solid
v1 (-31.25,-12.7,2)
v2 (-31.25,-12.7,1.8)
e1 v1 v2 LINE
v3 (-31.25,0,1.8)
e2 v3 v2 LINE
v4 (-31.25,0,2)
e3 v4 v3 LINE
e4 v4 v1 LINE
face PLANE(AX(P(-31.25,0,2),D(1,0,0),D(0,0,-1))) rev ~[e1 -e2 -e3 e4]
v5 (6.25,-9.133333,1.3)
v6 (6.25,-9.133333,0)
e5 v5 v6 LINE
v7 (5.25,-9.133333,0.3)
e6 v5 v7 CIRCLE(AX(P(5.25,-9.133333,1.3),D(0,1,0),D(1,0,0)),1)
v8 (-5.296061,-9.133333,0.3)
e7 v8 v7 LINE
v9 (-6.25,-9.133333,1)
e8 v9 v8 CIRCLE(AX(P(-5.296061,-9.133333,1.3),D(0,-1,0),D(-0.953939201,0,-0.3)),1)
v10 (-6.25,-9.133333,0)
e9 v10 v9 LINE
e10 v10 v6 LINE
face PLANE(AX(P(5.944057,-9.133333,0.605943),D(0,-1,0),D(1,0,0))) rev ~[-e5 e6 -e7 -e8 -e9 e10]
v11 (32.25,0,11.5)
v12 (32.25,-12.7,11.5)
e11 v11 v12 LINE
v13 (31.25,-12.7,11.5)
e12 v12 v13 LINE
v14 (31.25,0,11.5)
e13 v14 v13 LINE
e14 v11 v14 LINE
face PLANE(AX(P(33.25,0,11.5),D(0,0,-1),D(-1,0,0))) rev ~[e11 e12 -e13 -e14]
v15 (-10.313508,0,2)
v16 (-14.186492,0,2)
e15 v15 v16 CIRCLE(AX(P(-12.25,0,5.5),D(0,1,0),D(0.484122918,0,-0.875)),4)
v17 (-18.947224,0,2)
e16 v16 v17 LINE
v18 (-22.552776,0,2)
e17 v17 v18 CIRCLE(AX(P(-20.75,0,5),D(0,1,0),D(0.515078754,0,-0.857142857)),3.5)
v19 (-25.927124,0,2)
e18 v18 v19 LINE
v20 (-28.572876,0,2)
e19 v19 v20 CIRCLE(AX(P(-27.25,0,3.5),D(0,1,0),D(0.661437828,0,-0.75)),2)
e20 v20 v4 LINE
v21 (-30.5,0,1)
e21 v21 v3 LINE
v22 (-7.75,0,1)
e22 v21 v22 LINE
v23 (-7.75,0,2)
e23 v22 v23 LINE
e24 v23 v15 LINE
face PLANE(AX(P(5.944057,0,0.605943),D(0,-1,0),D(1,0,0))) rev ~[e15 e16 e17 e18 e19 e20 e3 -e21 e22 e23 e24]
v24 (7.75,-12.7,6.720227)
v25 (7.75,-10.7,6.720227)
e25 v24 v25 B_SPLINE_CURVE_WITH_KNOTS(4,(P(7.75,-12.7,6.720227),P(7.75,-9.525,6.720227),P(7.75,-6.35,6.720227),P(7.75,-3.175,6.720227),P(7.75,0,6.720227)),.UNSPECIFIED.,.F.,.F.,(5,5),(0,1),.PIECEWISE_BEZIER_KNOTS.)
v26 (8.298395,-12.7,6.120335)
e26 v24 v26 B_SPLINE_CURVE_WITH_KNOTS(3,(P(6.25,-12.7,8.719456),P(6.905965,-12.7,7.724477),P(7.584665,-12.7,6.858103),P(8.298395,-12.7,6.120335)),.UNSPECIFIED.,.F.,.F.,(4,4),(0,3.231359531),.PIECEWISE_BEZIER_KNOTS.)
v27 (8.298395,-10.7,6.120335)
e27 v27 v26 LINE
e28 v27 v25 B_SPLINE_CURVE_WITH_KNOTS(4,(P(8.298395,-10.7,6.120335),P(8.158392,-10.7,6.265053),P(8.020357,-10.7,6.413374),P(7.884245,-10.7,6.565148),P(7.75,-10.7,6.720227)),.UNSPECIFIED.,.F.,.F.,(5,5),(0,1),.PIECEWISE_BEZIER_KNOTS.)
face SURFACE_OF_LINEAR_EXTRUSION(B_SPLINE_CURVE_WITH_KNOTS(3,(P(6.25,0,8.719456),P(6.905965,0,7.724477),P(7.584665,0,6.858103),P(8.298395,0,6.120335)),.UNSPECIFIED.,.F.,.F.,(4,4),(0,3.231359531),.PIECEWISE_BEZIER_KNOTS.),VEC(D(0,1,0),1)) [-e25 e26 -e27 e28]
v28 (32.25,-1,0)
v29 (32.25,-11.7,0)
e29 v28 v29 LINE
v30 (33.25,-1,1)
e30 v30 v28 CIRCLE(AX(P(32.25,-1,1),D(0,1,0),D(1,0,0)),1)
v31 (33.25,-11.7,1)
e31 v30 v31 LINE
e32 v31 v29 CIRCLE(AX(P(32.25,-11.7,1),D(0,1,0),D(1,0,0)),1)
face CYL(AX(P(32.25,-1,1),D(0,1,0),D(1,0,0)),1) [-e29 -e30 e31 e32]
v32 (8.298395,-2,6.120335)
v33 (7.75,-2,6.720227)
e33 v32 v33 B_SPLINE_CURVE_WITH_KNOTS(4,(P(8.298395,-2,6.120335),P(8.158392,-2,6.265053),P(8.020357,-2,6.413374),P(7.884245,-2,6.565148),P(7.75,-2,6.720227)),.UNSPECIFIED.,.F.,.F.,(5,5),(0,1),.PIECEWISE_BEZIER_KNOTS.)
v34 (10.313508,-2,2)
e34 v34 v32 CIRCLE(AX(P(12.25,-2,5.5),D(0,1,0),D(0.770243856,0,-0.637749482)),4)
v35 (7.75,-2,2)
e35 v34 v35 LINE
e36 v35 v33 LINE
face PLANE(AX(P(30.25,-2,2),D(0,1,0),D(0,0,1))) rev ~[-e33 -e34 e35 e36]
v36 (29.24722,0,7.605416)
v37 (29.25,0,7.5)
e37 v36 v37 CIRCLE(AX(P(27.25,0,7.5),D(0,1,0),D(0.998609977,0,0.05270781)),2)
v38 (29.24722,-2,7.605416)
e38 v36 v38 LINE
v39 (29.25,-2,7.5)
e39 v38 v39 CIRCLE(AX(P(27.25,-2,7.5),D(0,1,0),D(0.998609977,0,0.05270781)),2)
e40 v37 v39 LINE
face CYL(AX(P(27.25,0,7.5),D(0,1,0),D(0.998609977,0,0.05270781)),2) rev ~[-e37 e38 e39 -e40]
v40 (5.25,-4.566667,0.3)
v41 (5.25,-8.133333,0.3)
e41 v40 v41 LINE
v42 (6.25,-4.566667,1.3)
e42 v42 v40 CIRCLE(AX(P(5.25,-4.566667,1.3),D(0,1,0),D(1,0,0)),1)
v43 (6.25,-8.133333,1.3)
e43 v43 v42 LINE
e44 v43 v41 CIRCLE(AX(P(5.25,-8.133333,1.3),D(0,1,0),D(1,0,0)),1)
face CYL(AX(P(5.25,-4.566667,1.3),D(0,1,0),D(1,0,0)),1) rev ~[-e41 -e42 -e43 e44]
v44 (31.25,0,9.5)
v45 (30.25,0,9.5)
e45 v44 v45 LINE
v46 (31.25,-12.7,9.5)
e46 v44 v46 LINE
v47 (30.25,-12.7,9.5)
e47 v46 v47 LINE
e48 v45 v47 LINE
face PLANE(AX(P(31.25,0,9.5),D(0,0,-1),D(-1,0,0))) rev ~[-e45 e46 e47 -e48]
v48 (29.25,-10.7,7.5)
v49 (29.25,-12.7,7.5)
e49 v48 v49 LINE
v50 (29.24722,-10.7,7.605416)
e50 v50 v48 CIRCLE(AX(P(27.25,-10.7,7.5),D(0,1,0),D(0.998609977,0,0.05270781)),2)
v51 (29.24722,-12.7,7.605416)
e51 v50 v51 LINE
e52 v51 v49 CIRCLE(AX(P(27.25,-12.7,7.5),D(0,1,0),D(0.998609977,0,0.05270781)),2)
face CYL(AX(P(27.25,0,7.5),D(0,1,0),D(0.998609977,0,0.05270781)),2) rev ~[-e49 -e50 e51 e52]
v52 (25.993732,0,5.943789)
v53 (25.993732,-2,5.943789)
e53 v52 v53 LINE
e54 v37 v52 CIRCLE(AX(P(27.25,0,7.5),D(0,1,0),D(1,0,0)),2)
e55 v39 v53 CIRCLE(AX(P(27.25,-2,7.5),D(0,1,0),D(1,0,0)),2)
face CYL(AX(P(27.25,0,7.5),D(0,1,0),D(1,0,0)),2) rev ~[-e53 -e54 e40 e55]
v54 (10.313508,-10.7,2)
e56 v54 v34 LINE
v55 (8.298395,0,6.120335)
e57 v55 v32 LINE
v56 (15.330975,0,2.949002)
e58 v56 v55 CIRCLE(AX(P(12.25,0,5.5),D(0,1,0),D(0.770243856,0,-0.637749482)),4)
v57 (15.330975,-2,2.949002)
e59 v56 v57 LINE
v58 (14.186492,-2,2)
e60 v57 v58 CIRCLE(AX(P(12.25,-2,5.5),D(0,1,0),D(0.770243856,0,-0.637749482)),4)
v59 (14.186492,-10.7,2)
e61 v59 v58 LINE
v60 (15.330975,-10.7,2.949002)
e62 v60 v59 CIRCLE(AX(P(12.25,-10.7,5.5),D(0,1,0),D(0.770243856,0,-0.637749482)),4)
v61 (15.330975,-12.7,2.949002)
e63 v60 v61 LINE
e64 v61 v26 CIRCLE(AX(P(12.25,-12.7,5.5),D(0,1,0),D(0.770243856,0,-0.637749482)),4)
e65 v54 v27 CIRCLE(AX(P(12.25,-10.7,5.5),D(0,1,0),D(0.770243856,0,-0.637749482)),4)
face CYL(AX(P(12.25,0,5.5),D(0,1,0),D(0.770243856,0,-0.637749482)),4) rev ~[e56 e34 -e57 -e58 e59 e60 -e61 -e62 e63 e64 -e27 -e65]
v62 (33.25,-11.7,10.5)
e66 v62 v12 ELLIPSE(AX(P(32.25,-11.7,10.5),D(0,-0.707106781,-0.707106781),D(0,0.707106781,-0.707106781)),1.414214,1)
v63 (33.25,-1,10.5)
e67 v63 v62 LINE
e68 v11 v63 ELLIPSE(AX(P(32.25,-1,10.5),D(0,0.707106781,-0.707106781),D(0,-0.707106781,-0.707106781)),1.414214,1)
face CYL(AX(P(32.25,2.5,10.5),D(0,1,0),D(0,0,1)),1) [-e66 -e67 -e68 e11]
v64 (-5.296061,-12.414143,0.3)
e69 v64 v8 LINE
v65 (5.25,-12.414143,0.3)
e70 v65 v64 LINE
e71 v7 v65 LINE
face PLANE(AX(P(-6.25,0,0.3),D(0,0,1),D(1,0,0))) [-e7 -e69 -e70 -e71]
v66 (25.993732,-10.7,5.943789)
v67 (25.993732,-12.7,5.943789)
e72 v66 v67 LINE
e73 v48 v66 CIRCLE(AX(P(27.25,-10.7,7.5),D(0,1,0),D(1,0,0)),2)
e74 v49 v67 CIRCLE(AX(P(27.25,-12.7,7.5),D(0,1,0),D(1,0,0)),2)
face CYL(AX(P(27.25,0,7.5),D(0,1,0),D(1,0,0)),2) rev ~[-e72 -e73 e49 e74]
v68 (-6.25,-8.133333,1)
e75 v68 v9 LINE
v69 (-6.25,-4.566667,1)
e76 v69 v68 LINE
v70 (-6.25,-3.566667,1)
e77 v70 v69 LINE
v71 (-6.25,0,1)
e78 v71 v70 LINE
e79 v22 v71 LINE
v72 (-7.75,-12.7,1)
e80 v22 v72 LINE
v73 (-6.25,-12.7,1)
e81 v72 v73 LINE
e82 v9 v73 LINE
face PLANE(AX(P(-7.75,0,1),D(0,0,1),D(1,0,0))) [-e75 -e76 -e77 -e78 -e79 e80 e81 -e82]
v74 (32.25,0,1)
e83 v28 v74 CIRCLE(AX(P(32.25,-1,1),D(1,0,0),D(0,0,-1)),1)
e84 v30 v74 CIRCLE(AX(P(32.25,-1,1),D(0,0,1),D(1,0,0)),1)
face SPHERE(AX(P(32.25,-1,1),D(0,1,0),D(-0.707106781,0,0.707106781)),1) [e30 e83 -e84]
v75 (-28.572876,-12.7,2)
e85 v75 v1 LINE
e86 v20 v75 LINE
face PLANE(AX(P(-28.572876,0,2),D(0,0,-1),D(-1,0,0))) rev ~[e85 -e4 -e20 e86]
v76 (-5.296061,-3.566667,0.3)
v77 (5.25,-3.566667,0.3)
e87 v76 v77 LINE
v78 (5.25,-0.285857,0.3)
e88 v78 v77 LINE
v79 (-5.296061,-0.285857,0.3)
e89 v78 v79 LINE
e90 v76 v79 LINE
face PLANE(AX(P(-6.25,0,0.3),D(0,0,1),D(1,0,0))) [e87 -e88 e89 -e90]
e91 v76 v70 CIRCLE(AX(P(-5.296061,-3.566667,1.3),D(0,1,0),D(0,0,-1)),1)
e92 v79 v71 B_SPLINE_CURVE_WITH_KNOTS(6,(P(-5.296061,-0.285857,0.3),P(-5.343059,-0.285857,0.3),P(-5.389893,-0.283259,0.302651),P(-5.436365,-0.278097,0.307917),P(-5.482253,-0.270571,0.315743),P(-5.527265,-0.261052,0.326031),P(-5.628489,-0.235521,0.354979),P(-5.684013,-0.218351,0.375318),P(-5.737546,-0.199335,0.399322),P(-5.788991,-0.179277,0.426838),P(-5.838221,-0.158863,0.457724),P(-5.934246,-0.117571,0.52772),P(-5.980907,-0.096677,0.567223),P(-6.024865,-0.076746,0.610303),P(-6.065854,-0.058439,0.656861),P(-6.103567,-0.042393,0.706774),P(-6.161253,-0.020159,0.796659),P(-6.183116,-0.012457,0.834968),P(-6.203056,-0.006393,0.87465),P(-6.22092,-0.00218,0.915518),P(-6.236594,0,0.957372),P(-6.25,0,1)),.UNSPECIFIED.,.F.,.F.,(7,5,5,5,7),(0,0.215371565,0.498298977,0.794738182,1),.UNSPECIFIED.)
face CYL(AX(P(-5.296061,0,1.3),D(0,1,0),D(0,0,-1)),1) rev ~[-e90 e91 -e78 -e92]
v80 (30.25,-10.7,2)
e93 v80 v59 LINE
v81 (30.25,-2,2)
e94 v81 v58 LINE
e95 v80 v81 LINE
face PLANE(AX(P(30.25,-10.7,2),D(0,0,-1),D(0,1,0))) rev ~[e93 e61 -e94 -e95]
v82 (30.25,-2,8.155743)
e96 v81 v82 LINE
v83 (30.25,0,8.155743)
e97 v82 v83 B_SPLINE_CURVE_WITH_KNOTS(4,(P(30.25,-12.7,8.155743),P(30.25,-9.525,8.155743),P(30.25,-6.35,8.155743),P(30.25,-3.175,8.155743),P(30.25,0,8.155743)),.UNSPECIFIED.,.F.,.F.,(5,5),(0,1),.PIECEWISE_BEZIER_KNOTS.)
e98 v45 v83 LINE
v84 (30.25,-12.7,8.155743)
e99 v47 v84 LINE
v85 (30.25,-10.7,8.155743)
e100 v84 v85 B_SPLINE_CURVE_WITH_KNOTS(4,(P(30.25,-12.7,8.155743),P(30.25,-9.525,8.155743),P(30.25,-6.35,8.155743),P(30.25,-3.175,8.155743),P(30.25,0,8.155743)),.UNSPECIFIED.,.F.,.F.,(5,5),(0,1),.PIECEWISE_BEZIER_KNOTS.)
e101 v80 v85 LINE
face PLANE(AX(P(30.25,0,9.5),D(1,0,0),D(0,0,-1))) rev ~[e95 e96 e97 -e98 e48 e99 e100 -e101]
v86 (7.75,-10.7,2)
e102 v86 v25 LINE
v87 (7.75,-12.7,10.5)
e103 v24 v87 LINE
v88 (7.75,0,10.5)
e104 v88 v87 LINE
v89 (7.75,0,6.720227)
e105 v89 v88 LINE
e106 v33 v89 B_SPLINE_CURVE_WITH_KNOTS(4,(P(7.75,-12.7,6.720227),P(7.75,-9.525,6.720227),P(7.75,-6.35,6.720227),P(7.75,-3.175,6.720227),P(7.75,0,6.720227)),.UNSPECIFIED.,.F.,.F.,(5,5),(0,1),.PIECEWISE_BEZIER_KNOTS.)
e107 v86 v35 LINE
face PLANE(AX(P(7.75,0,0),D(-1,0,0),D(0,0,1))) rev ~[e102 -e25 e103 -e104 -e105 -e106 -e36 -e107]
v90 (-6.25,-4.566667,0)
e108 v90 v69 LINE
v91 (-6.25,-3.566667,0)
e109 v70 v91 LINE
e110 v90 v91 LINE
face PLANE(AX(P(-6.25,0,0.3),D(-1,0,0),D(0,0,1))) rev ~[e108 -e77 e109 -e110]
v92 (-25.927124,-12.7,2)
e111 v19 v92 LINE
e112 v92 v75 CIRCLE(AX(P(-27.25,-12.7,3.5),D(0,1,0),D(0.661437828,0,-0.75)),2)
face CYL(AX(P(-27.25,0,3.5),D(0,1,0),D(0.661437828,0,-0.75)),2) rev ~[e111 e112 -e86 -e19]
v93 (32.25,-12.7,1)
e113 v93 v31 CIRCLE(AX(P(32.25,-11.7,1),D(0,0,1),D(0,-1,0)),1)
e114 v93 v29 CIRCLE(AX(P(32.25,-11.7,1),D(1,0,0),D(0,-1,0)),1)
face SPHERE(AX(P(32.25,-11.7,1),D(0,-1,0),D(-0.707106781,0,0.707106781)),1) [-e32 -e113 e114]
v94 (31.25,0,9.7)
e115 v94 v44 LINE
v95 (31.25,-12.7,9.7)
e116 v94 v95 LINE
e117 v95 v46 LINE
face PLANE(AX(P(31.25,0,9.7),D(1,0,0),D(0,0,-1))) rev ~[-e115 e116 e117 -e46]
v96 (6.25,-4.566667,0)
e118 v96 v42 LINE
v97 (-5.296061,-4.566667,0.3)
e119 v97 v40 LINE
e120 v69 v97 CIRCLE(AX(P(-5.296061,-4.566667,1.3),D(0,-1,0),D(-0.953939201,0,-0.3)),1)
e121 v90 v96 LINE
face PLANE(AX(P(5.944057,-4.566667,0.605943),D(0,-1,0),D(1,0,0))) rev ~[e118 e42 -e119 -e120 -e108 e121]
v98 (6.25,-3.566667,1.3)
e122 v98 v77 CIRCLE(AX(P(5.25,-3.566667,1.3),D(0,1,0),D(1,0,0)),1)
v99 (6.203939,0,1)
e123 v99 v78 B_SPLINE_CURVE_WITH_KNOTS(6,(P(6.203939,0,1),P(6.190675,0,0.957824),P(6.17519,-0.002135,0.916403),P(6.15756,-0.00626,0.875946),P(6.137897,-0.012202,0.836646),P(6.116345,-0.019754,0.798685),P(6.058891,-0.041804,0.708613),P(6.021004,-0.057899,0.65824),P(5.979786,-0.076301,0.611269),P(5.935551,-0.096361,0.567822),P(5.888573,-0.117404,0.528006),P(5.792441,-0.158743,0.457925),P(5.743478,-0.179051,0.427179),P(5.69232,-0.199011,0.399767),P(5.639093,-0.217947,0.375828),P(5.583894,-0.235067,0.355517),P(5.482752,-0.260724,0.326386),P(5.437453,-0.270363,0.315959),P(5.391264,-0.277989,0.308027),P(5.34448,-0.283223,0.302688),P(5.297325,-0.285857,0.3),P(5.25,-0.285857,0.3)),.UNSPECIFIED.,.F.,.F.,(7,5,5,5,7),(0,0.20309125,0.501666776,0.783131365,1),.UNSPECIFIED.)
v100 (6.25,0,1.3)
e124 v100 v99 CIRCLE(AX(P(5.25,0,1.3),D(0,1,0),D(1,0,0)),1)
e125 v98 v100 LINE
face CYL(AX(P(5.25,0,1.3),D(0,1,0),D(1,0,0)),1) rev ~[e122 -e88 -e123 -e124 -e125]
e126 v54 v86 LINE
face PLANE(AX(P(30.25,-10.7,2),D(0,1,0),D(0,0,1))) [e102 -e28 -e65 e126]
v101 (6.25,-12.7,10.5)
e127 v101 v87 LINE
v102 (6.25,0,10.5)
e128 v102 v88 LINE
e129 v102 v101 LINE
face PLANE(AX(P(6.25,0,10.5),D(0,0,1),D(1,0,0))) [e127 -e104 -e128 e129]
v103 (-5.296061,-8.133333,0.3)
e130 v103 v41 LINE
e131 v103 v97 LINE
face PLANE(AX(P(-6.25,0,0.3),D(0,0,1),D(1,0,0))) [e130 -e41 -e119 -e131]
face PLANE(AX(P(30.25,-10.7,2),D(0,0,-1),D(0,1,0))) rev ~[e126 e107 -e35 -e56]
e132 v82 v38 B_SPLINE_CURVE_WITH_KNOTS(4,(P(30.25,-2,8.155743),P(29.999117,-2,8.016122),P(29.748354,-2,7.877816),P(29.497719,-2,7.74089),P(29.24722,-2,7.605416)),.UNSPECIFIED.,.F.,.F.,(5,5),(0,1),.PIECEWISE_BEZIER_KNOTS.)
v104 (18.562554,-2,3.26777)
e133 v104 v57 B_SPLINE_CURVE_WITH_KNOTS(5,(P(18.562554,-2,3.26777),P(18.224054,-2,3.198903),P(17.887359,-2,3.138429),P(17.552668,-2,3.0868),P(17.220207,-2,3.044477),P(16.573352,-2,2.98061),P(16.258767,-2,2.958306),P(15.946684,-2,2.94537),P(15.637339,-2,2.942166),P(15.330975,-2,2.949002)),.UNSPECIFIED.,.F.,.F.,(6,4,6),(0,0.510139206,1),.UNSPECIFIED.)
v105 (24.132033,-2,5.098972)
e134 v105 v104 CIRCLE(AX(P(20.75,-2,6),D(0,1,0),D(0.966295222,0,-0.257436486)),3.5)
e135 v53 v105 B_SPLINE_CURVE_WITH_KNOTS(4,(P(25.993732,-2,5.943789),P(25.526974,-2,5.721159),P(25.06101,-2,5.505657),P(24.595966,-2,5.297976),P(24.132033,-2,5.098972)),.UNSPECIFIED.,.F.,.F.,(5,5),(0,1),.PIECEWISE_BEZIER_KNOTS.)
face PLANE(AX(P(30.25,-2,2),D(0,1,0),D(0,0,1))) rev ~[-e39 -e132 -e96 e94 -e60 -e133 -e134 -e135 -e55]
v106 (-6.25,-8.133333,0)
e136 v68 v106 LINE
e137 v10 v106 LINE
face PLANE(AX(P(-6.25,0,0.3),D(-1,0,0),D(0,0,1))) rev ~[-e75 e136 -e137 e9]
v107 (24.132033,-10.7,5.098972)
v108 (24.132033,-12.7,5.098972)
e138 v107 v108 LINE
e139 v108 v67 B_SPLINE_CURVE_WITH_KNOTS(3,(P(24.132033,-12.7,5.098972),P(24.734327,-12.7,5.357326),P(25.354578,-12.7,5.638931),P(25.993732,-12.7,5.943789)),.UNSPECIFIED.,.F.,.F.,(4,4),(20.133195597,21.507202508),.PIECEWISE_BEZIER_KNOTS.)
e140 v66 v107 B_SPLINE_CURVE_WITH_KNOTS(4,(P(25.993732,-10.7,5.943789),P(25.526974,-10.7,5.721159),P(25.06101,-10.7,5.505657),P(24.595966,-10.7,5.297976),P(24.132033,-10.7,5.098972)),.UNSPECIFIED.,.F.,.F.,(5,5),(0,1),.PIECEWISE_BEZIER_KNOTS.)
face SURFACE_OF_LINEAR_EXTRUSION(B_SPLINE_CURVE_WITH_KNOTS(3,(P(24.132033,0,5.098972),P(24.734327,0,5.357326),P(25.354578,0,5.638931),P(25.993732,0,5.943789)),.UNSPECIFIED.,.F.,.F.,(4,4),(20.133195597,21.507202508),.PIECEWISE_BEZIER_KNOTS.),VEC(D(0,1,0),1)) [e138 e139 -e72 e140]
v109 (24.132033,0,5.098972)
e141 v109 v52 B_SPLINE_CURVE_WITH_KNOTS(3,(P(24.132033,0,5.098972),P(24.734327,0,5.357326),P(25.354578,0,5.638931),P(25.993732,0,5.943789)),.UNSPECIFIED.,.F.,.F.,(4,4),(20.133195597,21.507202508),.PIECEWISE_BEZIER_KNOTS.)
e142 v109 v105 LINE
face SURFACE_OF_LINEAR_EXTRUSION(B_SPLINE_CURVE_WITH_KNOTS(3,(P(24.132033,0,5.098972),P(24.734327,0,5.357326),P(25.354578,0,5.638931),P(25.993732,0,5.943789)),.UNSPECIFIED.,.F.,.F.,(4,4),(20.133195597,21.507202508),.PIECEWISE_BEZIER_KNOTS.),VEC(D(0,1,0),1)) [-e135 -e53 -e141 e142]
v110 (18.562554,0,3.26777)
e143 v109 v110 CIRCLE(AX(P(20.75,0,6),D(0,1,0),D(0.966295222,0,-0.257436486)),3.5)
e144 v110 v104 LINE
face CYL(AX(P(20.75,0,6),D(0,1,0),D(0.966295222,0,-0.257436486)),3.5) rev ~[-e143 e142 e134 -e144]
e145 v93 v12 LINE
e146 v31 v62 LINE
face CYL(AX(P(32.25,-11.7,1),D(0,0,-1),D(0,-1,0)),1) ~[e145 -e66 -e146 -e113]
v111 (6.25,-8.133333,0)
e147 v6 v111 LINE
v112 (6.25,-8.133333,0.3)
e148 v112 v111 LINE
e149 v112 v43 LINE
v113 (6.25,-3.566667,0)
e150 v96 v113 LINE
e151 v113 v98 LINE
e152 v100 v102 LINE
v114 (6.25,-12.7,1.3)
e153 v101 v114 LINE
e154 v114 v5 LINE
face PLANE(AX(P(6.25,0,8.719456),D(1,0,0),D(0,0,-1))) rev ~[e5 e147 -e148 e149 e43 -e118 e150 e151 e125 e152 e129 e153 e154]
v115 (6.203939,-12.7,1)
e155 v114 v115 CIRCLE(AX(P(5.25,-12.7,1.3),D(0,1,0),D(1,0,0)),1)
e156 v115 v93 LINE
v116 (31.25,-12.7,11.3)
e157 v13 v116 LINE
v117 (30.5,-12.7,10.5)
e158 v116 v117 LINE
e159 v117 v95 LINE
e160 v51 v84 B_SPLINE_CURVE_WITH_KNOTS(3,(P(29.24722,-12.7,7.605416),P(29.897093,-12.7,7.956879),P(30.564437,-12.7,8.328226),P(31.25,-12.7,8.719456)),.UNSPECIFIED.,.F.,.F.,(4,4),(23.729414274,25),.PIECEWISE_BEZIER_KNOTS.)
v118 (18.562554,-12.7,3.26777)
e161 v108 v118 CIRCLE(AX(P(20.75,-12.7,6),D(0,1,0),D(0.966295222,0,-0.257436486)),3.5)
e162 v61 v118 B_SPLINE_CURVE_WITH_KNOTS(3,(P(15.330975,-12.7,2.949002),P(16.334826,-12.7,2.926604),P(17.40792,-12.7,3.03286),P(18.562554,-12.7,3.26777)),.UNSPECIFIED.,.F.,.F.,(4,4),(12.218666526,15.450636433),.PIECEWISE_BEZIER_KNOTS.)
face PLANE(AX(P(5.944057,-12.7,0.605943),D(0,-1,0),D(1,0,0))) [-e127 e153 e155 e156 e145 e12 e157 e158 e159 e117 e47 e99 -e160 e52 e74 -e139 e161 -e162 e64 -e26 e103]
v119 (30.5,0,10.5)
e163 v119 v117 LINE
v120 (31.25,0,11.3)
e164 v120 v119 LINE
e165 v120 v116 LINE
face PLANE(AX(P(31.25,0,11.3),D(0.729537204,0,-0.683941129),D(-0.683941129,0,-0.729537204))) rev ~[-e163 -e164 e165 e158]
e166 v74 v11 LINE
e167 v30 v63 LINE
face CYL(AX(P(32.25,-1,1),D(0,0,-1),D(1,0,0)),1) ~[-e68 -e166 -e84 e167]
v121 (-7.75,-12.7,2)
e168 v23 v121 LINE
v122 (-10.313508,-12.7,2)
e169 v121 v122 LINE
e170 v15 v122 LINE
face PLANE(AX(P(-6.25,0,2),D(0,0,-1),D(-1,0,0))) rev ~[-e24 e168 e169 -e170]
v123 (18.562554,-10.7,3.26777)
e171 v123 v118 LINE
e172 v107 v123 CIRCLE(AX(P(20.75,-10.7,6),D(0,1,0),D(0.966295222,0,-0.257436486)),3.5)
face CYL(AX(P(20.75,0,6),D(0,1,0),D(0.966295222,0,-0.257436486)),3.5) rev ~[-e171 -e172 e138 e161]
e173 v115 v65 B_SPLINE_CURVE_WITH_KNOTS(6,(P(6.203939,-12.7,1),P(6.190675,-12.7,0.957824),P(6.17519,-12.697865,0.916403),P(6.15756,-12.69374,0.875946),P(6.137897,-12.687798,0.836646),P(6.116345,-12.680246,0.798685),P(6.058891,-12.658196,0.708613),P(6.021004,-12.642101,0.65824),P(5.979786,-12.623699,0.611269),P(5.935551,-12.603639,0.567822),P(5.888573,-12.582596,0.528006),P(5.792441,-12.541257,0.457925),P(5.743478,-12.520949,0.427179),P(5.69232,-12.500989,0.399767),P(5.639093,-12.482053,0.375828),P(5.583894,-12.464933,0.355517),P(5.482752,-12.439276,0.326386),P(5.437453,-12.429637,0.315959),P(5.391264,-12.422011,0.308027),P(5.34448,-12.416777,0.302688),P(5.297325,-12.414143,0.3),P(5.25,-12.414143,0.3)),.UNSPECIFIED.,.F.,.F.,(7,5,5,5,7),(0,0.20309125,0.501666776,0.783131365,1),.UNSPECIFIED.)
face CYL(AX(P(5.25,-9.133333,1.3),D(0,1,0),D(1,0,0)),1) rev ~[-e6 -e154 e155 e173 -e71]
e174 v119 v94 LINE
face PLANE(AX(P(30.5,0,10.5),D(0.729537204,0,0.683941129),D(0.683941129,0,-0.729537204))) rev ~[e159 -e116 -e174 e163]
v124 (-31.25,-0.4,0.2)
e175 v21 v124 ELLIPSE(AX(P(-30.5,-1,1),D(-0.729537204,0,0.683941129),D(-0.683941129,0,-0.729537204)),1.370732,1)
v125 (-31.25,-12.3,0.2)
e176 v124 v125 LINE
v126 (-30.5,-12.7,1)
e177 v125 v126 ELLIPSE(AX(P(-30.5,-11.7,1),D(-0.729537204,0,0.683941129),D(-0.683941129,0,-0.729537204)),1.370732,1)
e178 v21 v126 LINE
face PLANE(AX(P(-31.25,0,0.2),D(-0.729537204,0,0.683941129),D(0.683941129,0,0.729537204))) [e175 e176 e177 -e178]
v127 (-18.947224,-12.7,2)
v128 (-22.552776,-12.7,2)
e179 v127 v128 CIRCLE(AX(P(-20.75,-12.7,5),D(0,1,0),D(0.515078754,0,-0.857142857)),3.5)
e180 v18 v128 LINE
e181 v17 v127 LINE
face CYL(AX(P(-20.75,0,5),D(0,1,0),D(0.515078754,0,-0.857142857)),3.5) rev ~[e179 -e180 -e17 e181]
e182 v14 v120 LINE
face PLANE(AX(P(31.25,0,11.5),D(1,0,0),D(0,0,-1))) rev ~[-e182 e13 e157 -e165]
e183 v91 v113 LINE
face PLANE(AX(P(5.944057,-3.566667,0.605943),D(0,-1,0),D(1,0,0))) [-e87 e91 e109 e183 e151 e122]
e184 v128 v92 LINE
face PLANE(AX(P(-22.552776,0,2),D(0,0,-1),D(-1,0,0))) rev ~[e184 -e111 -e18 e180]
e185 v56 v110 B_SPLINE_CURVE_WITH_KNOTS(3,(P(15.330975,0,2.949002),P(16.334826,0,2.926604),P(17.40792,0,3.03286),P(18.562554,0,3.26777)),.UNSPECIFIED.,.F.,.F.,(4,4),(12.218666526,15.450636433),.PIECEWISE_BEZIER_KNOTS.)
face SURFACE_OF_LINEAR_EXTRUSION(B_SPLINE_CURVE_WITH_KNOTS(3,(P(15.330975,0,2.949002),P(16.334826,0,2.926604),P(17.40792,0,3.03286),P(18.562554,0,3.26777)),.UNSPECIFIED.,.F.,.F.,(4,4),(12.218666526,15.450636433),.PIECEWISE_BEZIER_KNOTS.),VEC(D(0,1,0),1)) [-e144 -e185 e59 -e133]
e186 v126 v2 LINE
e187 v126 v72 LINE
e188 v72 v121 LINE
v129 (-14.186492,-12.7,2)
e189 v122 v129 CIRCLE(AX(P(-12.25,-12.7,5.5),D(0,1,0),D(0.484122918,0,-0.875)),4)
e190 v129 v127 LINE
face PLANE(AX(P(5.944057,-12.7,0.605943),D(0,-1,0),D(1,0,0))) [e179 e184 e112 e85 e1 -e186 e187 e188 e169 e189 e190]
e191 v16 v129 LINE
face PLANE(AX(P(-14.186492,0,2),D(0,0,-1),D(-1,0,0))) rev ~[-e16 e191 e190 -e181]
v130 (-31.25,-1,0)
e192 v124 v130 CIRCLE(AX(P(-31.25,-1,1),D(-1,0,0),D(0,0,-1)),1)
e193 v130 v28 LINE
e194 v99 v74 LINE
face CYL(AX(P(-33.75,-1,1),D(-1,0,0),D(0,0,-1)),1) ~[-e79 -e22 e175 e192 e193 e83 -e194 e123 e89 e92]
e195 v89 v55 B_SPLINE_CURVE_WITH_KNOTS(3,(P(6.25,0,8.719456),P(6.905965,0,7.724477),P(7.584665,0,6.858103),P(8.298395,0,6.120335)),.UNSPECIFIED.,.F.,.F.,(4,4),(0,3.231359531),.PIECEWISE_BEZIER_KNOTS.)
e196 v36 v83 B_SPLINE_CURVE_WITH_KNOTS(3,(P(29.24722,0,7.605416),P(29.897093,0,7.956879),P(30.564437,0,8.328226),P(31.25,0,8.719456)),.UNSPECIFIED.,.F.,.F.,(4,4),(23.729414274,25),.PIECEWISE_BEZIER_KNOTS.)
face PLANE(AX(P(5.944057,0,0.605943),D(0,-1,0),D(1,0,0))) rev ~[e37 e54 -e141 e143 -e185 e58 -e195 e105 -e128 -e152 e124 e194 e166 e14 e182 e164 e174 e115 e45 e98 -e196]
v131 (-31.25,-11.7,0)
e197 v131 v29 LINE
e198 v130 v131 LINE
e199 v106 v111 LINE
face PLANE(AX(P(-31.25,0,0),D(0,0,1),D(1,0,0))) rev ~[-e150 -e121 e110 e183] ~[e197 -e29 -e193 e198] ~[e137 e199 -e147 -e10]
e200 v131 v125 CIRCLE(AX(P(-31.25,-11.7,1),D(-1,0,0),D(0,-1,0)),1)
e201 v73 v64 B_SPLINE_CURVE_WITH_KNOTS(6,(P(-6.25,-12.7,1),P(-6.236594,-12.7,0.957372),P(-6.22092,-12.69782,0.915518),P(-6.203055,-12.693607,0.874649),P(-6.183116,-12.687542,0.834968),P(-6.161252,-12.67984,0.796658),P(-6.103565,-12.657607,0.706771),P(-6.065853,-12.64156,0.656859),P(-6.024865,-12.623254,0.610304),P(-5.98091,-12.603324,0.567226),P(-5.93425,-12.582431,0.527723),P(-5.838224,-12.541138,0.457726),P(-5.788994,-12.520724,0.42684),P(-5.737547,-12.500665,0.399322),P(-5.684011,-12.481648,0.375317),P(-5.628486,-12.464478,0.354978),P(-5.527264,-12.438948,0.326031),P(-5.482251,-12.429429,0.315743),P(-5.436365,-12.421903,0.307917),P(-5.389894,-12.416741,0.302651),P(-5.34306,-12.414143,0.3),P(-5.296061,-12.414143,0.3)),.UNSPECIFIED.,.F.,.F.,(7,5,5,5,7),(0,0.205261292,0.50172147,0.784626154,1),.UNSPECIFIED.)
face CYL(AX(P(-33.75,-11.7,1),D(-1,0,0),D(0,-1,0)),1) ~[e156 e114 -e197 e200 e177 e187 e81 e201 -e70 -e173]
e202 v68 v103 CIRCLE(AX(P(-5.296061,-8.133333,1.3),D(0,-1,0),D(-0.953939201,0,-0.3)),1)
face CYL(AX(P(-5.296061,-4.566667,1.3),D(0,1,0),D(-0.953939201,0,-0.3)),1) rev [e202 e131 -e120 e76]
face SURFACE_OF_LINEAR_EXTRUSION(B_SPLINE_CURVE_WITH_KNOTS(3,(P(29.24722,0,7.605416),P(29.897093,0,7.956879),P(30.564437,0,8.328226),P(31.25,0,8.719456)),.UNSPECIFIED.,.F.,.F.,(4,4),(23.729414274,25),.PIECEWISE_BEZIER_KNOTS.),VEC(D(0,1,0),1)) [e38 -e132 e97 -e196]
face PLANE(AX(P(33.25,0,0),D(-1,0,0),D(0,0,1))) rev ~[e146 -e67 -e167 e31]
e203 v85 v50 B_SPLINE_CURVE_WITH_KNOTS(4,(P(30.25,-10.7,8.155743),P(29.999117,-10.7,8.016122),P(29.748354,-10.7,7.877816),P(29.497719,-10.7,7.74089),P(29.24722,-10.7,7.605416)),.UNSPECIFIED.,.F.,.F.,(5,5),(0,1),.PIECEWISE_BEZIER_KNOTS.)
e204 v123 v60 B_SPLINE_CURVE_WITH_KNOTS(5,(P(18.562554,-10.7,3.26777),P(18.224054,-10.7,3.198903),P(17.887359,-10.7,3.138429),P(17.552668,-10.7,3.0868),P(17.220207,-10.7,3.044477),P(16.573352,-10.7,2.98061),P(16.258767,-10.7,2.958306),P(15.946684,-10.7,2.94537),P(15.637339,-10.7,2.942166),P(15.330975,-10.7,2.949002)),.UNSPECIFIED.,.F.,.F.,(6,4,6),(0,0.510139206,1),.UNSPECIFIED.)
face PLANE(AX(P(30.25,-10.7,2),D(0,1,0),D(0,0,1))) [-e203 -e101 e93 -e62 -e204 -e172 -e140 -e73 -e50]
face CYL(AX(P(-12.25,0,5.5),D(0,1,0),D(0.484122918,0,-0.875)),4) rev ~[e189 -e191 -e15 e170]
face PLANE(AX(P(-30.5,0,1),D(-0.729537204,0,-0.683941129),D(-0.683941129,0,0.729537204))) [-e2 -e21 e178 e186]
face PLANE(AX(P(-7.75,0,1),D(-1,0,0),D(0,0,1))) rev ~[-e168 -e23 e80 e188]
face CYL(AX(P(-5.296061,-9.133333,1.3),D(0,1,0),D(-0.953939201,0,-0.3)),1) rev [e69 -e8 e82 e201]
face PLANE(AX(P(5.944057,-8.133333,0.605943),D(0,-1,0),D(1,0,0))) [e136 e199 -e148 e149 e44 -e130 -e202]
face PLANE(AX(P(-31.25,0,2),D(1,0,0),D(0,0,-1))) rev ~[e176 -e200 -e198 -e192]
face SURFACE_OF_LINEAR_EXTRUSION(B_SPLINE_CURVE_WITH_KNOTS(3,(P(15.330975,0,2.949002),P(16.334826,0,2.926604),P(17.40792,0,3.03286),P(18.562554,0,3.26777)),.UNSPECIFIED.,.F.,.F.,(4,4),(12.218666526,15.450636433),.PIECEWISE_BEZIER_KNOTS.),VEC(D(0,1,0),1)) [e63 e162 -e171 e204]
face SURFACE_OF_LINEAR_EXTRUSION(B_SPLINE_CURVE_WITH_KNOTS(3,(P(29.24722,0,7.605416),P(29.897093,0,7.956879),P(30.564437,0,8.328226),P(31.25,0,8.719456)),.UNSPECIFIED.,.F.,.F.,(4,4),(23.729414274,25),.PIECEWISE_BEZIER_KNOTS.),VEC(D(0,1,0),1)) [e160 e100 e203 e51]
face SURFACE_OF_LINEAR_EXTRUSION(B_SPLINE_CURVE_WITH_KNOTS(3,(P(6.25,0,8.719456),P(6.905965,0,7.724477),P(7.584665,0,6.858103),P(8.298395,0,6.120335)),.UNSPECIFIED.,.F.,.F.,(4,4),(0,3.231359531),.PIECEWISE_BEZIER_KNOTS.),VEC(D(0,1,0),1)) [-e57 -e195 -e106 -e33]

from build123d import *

# Parameters (mm, degrees)
F1_W          = 12.5
F1_H          = 0.3
F2_DEPTH      = 12.7
F5_START      = -1
F3_W          = 8.7
F3_H          = 6.7194561801
F5_DEPTH      = 22.5
F4_W          = 1.5
F4_H          = 1
F6_DEPTH      = 12.7
F4_H_2        = 10.5
F7_DEPTH      = 12.7
F8_W          = 12.5
F8_H          = 1
F9_DEPTH      = 0.3
F10_T1_DEPTH  = 3.5666666667
F10_T3_DEPTH  = 3.5666666667
F10_T5_DEPTH  = 3.5666666667
F10_T10_DEPTH = 8.5666666667
F10_T15_DEPTH = 8.5666666667
F10_T20_DEPTH = 8.5666666667
F10_T25_DEPTH = 8.5666666667
F10_T30_DEPTH = 8.3363626738
F10_T35_DEPTH = 8.3363626738
F10_T40_DEPTH = 8.3363626738
F10_T45_DEPTH = 8.3363626738
F11_T1_DEPTH  = 66
F11_T3_DEPTH  = 10.7
F11_T5_DEPTH  = 13
F11_T7_DEPTH  = 17.7
F11_S11_W     = 1
F11_S11_H     = 1
F11_T12_DEPTH = 1
F11_S17_W     = 1
F11_S17_H     = 1
F11_T18_DEPTH = 1


# Not quite as in the source:
# - a fillet or chamfer that OpenCascade refuses, or shapes differently, is made with other operations: its cross-section is extruded or revolved along the edge and cut away or added
# - a feature names something its author has since deleted; it is built from what else it names


with BuildPart() as f2:
    # F1 (on Front) → F2 (new body)
    with BuildSketch(Plane.XZ):
        with BuildLine():
            ThreePointArc((-25.9271243445, 2), (-27.25, 1.5), (-28.5728756555, 2))
            Line((-28.5728756555, 2), (-31.25, 2))
            Line((-31.25, 2), (-31.25, 0))
            Line((-31.25, 0), (-6.25, 0))
            Line((-6.25, 0), (-6.25, 0.3))
            Line((-6.25, 0.3), (-6.25, 2))
            Line((-6.25, 2), (-10.3135083269, 2))
            ThreePointArc((-10.3135083269, 2), (-12.25, 1.5), (-14.1864916731, 2))
            Line((-14.1864916731, 2), (-18.9472243623, 2))
            ThreePointArc((-18.9472243623, 2), (-20.75, 1.5), (-22.5527756377, 2))
            Line((-22.5527756377, 2), (-25.9271243445, 2))
        make_face()
        with Locations((0, 0.15)):
            Rectangle(F1_W, F1_H)
        with BuildLine():
            Line((6.25, 0.3), (6.25, 0))
            Line((6.25, 0), (31.25, 0))
            Line((31.25, 0), (31.25, 8.7194561801))
            add(Edge.make_bspline(
                [(29.2472199547, 7.6054156174), (29.8970928976, 7.9568787945), (30.5644371549, 8.3282256487), (31.25, 8.7194561801)],
                knots=[23.7294142738, 23.7294142738, 23.7294142738, 23.7294142738, 25, 25, 25, 25], degree=3))
            ThreePointArc((29.2472199547, 7.6054156174), (29.2493048679, 7.5527261345), (29.25, 7.5))
            ThreePointArc((29.25, 7.5), (28.112399222, 5.6954868851), (25.993732418, 5.9437892937))
            add(Edge.make_bspline(
                [(24.1320332758, 5.0989722973), (24.7343267633, 5.3573256266), (25.3545781422, 5.638931292), (25.993732418, 5.9437892937)],
                knots=[20.1331955968, 20.1331955968, 20.1331955968, 20.1331955968, 21.5072025076, 21.5072025076, 21.5072025076, 21.5072025076], degree=3))
            ThreePointArc((24.1320332758, 5.0989722973), (21.8431992343, 2.6751067033), (18.5625536561, 3.2677704173))
            add(Edge.make_bspline(
                [(15.3309754243, 2.9490020708), (16.3348264574, 2.926604162), (17.4079195378, 3.0328602775), (18.5625536561, 3.2677704173)],
                knots=[12.2186665261, 12.2186665261, 12.2186665261, 12.2186665261, 15.4506364332, 15.4506364332, 15.4506364332, 15.4506364332], degree=3))
            ThreePointArc((15.3309754243, 2.9490020708), (10.6056653115, 1.8536095338), (8.2983946259, 6.1203345608))
            add(Edge.make_bspline(
                [(6.25, 8.7194561801), (6.9059645215, 7.7244768722), (7.5846653889, 6.8581029991), (8.2983946259, 6.1203345608)],
                knots=[0, 0, 0, 0, 3.2313595313, 3.2313595313, 3.2313595313, 3.2313595313], degree=3))
            Line((6.25, 8.7194561801), (6.25, 0.3))
        make_face()
    extrude(amount=F2_DEPTH)

    # F3 (on face) → F5 (cut)
    with BuildSketch(Plane.YZ.offset(31.25).offset(F5_START)):
        with Locations((-6.35, 5.35972809)):
            Rectangle(F3_W, F3_H)
    extrude(amount=-F5_DEPTH, mode=Mode.SUBTRACT)

    # F4 (on Front) → F6 (cut, through all)
    with BuildSketch(Plane.XZ):
        with Locations((-7, 1.5)):
            Rectangle(F4_W, F4_H)
        Polygon((-30.5, 1), (-31.25, 1.8), (-31.25, 1), align=None)
        Polygon((-30.5, 1), (-31.25, 1), (-31.25, 0.2), align=None)
    extrude(amount=F6_DEPTH, mode=Mode.SUBTRACT)

    # F4 (on Front) → F7 (join, through all)
    with BuildSketch(Plane.XZ):
        Polygon((30.25, 0), (31.25, 0), (33.25, 0), (33.25, 11.5), (31.25, 11.5), (31.25, 11.3), (31.25, 10.5), (31.25, 9.7), (31.25, 9.5), (30.25, 9.5), align=None)
        with Locations((7, 5.25)):
            Rectangle(F4_W, F4_H_2)
        Polygon((30.5, 10.5), (31.25, 9.7), (31.25, 10.5), align=None)
        Polygon((31.25, 10.5), (31.25, 11.3), (30.5, 10.5), align=None)
    extrude(amount=F7_DEPTH)

    # F8 (on face) → F9 (cut, through all)
    with BuildSketch(Plane.XY.offset(0.3)):
        with Locations((0, -8.6333333333)):
            Rectangle(F8_W, F8_H)
        with Locations((0, -4.0666666667)):
            Rectangle(F8_W, F8_H)
    extrude(amount=-F9_DEPTH, mode=Mode.SUBTRACT)

    # F10: fillet of radius 1 on 6 edges, made by hand

    # F10_s2 → F10_t1 (join)
    with BuildSketch(Plane.XZ.offset(9.1333333333)):
        with BuildLine():
            ThreePointArc((6.25, 1.3), (5.9571067812, 0.5928932188), (5.25, 0.3))
            Line((5.25, 0.3), (6.25, 0.3))
            Line((6.25, 0.3), (6.25, 1.3))
        make_face()
        with BuildLine():
            ThreePointArc((-6.25, 1), (-5.8876687769, 0.4937742252), (-5.2960607986, 0.3))
            Line((-5.2960607986, 0.3), (-6.25, 0.3))
            Line((-6.25, 0.3), (-6.25, 1))
        make_face()
    extrude(amount=F10_T1_DEPTH)

    # F10_s4 → F10_t3 (join)
    with BuildSketch(Plane.XZ.offset(4.5666666667)):
        with BuildLine():
            ThreePointArc((6.25, 1.3), (5.9571067812, 0.5928932188), (5.25, 0.3))
            Line((5.25, 0.3), (6.25, 0.3))
            Line((6.25, 0.3), (6.25, 1.3))
        make_face()
        with BuildLine():
            ThreePointArc((-6.25, 1), (-5.8876687769, 0.4937742252), (-5.2960607986, 0.3))
            Line((-5.2960607986, 0.3), (-6.25, 0.3))
            Line((-6.25, 0.3), (-6.25, 1))
        make_face()
    extrude(amount=F10_T3_DEPTH)

    # F10_s6 → F10_t5 (join)
    with BuildSketch(Plane.XZ):
        with BuildLine():
            ThreePointArc((6.25, 1.3), (5.9571067812, 0.5928932188), (5.25, 0.3))
            Line((5.25, 0.3), (6.25, 0.3))
            Line((6.25, 0.3), (6.25, 1.3))
        make_face()
        with BuildLine():
            ThreePointArc((-5.2960607986, 0.3), (-5.8876687769, 0.4937742252), (-6.25, 1))
            Line((-6.25, 1), (-6.25, 0.3))
            Line((-6.25, 0.3), (-5.2960607986, 0.3))
        make_face()
    extrude(amount=F10_T5_DEPTH)


with BuildPart() as f10_tool8:
    # F10_s9 → F10_t10 (new body)
    with BuildSketch(Plane.XZ.offset(6.6333333333)):
        with BuildLine():
            ThreePointArc((6.25, 1.3), (5.9571067812, 0.5928932188), (5.25, 0.3))
            Line((5.25, 0.3), (6.25, 0.3))
            Line((6.25, 0.3), (6.25, 1.3))
        make_face()
    extrude(amount=F10_T10_DEPTH)

    split(bisect_by=Plane.XZ.offset(8.1333333333), keep=Keep.BOTTOM)


with BuildPart() as f2_1:
    add(f2.part)

    # F10_t7: union F10_tool8
    add(f10_tool8.part)


with BuildPart() as f10_tool13:
    # F10_s14 → F10_t15 (new body)
    with BuildSketch(Plane.XZ.offset(2.0666666667)):
        with BuildLine():
            ThreePointArc((6.25, 1.3), (5.9571067812, 0.5928932188), (5.25, 0.3))
            Line((5.25, 0.3), (6.25, 0.3))
            Line((6.25, 0.3), (6.25, 1.3))
        make_face()
    extrude(amount=F10_T15_DEPTH)

    split(bisect_by=Plane.XZ.offset(3.5666666667), keep=Keep.BOTTOM)


with BuildPart() as f2_2:
    add(f2_1.part)

    # F10_t12: union F10_tool13
    add(f10_tool13.part)


with BuildPart() as f10_tool18:
    # F10_s19 → F10_t20 (new body)
    with BuildSketch(Plane.XZ.offset(2.0666666667)):
        with BuildLine():
            ThreePointArc((6.25, 1.3), (5.9571067812, 0.5928932188), (5.25, 0.3))
            Line((5.25, 0.3), (6.25, 0.3))
            Line((6.25, 0.3), (6.25, 1.3))
        make_face()
    extrude(amount=F10_T20_DEPTH)

    split(bisect_by=Plane.XZ.offset(9.1333333333), keep=Keep.TOP)


with BuildPart() as f2_3:
    add(f2_2.part)

    # F10_t17: union F10_tool18
    add(f10_tool18.part)


with BuildPart() as f10_tool23:
    # F10_s24 → F10_t25 (new body)
    with BuildSketch(Plane.XZ.offset(-2.5)):
        with BuildLine():
            ThreePointArc((6.25, 1.3), (5.9571067812, 0.5928932188), (5.25, 0.3))
            Line((5.25, 0.3), (6.25, 0.3))
            Line((6.25, 0.3), (6.25, 1.3))
        make_face()
    extrude(amount=F10_T25_DEPTH)

    split(bisect_by=Plane.XZ.offset(4.5666666667), keep=Keep.TOP)


with BuildPart() as f2_4:
    add(f2_3.part)

    # F10_t22: union F10_tool23
    add(f10_tool23.part)


with BuildPart() as f10_tool28:
    # F10_s29 → F10_t30 (new body)
    with BuildSketch(Plane.XZ.offset(-2.3848480035)):
        with BuildLine():
            ThreePointArc((-5.2960607986, 0.3), (-5.8876687769, 0.4937742252), (-6.25, 1))
            Line((-6.25, 1), (-6.25, 0.3))
            Line((-6.25, 0.3), (-5.2960607986, 0.3))
        make_face()
    extrude(amount=F10_T30_DEPTH)

    split(bisect_by=Plane.XZ.offset(4.5666666667), keep=Keep.TOP)


with BuildPart() as f2_5:
    add(f2_4.part)

    # F10_t27: union F10_tool28
    add(f10_tool28.part)


with BuildPart() as f10_tool33:
    # F10_s34 → F10_t35 (new body)
    with BuildSketch(Plane.XZ.offset(2.1818186631)):
        with BuildLine():
            ThreePointArc((-6.25, 1), (-5.8876687769, 0.4937742252), (-5.2960607986, 0.3))
            Line((-5.2960607986, 0.3), (-6.25, 0.3))
            Line((-6.25, 0.3), (-6.25, 1))
        make_face()
    extrude(amount=F10_T35_DEPTH)

    split(bisect_by=Plane.XZ.offset(3.5666666667), keep=Keep.BOTTOM)


with BuildPart() as f2_6:
    add(f2_5.part)

    # F10_t32: union F10_tool33
    add(f10_tool33.part)


with BuildPart() as f10_tool38:
    # F10_s39 → F10_t40 (new body)
    with BuildSketch(Plane.XZ.offset(2.1818186631)):
        with BuildLine():
            ThreePointArc((-6.25, 1), (-5.8876687769, 0.4937742252), (-5.2960607986, 0.3))
            Line((-5.2960607986, 0.3), (-6.25, 0.3))
            Line((-6.25, 0.3), (-6.25, 1))
        make_face()
    extrude(amount=F10_T40_DEPTH)

    split(bisect_by=Plane.XZ.offset(9.1333333333), keep=Keep.TOP)


with BuildPart() as f2_7:
    add(f2_6.part)

    # F10_t37: union F10_tool38
    add(f10_tool38.part)


with BuildPart() as f10_tool43:
    # F10_s44 → F10_t45 (new body)
    with BuildSketch(Plane.XZ.offset(6.7484853298)):
        with BuildLine():
            ThreePointArc((-6.25, 1), (-5.8876687769, 0.4937742252), (-5.2960607986, 0.3))
            Line((-5.2960607986, 0.3), (-6.25, 0.3))
            Line((-6.25, 0.3), (-6.25, 1))
        make_face()
    extrude(amount=F10_T45_DEPTH)

    split(bisect_by=Plane.XZ.offset(8.1333333333), keep=Keep.BOTTOM)


with BuildPart() as f2_8:
    add(f2_7.part)

    # F10_t42: union F10_tool43
    add(f10_tool43.part)

    # F11: fillet of radius 1 on 6 edges, made by hand

    # F11_s2 → F11_t1 (cut)
    with BuildSketch(Plane.YZ.offset(-33.75)):
        with BuildLine():
            ThreePointArc((-1, 0), (-0.2928932188, 0.2928932188), (0, 1))
            Line((0, 1), (0, 0))
            Line((0, 0), (-1, 0))
        make_face()
        with BuildLine():
            ThreePointArc((-12.7, 1), (-12.4071067812, 0.2928932188), (-11.7, 0))
            Line((-11.7, 0), (-12.7, 0))
            Line((-12.7, 0), (-12.7, 1))
        make_face()
    extrude(amount=F11_T1_DEPTH, mode=Mode.SUBTRACT)

    # F11_s4 → F11_t3 (cut)
    with BuildSketch(Plane.XZ.offset(1)):
        with BuildLine():
            ThreePointArc((33.25, 1), (32.9571067812, 0.2928932188), (32.25, 0))
            Line((32.25, 0), (33.25, 0))
            Line((33.25, 0), (33.25, 1))
        make_face()
    extrude(amount=F11_T3_DEPTH, mode=Mode.SUBTRACT)

    # F11_s6 → F11_t5 (cut)
    with BuildSketch(Plane.XY.offset(1)):
        with BuildLine():
            ThreePointArc((32.25, -12.7), (32.9571067812, -12.4071067812), (33.25, -11.7))
            Line((33.25, -11.7), (33.25, -12.7))
            Line((33.25, -12.7), (32.25, -12.7))
        make_face()
        with BuildLine():
            ThreePointArc((33.25, -1), (32.9571067812, -0.2928932188), (32.25, 0))
            Line((32.25, 0), (33.25, 0))
            Line((33.25, 0), (33.25, -1))
        make_face()
    extrude(amount=F11_T5_DEPTH, mode=Mode.SUBTRACT)

    # F11_s8 → F11_t7 (cut)
    with BuildSketch(Plane.XZ.offset(-2.5)):
        with BuildLine():
            ThreePointArc((32.25, 11.5), (32.9571067812, 11.2071067812), (33.25, 10.5))
            Line((33.25, 10.5), (33.25, 11.5))
            Line((33.25, 11.5), (32.25, 11.5))
        make_face()
    extrude(amount=F11_T7_DEPTH, mode=Mode.SUBTRACT)


with BuildPart() as f11_tool10:
    # F11_s11 → F11_t12 (new body)
    with BuildSketch(Plane.XZ.offset(1)):
        with Locations((32.75, 0.5)):
            Rectangle(F11_S11_W, F11_S11_H)
    extrude(amount=-F11_T12_DEPTH)

    # F11_s13 → F11_t14 (revolve, cut)
    with BuildSketch(Plane(origin=(32.25, -1, 1), x_dir=(-0.7071067812, 0, 0.7071067812), z_dir=(-0.7071067812, 0, -0.7071067812))):
        with BuildLine():
            ThreePointArc((0, -1), (1, 0), (0, 1))
            Line((0, 1), (0, -1))
        make_face()
    revolve(axis=Axis((32.25, -1, 1), (0, 1, 0)), mode=Mode.SUBTRACT)


with BuildPart() as f2_9:
    add(f2_8.part)

    # F11_t9: cut F11_tool10
    add(f11_tool10.part, mode=Mode.SUBTRACT)


with BuildPart() as f11_tool16:
    # F11_s17 → F11_t18 (new body)
    with BuildSketch(Plane.XZ.offset(11.7)):
        with Locations((32.75, 0.5)):
            Rectangle(F11_S17_W, F11_S17_H)
    extrude(amount=F11_T18_DEPTH)

    # F11_s19 → F11_t20 (revolve, cut)
    with BuildSketch(Plane(origin=(32.25, -11.7, 1), x_dir=(-0.7071067812, 0, 0.7071067812), z_dir=(0.7071067812, 0, 0.7071067812))):
        with BuildLine():
            ThreePointArc((0, -1), (1, 0), (0, 1))
            Line((0, 1), (0, -1))
        make_face()
    revolve(axis=Axis((32.25, -11.7, 1), (0, -1, 0)), mode=Mode.SUBTRACT)


with BuildPart() as f2_10:
    add(f2_9.part)

    # F11_t15: cut F11_tool16
    add(f11_tool16.part, mode=Mode.SUBTRACT)


solid = f2_10.part
